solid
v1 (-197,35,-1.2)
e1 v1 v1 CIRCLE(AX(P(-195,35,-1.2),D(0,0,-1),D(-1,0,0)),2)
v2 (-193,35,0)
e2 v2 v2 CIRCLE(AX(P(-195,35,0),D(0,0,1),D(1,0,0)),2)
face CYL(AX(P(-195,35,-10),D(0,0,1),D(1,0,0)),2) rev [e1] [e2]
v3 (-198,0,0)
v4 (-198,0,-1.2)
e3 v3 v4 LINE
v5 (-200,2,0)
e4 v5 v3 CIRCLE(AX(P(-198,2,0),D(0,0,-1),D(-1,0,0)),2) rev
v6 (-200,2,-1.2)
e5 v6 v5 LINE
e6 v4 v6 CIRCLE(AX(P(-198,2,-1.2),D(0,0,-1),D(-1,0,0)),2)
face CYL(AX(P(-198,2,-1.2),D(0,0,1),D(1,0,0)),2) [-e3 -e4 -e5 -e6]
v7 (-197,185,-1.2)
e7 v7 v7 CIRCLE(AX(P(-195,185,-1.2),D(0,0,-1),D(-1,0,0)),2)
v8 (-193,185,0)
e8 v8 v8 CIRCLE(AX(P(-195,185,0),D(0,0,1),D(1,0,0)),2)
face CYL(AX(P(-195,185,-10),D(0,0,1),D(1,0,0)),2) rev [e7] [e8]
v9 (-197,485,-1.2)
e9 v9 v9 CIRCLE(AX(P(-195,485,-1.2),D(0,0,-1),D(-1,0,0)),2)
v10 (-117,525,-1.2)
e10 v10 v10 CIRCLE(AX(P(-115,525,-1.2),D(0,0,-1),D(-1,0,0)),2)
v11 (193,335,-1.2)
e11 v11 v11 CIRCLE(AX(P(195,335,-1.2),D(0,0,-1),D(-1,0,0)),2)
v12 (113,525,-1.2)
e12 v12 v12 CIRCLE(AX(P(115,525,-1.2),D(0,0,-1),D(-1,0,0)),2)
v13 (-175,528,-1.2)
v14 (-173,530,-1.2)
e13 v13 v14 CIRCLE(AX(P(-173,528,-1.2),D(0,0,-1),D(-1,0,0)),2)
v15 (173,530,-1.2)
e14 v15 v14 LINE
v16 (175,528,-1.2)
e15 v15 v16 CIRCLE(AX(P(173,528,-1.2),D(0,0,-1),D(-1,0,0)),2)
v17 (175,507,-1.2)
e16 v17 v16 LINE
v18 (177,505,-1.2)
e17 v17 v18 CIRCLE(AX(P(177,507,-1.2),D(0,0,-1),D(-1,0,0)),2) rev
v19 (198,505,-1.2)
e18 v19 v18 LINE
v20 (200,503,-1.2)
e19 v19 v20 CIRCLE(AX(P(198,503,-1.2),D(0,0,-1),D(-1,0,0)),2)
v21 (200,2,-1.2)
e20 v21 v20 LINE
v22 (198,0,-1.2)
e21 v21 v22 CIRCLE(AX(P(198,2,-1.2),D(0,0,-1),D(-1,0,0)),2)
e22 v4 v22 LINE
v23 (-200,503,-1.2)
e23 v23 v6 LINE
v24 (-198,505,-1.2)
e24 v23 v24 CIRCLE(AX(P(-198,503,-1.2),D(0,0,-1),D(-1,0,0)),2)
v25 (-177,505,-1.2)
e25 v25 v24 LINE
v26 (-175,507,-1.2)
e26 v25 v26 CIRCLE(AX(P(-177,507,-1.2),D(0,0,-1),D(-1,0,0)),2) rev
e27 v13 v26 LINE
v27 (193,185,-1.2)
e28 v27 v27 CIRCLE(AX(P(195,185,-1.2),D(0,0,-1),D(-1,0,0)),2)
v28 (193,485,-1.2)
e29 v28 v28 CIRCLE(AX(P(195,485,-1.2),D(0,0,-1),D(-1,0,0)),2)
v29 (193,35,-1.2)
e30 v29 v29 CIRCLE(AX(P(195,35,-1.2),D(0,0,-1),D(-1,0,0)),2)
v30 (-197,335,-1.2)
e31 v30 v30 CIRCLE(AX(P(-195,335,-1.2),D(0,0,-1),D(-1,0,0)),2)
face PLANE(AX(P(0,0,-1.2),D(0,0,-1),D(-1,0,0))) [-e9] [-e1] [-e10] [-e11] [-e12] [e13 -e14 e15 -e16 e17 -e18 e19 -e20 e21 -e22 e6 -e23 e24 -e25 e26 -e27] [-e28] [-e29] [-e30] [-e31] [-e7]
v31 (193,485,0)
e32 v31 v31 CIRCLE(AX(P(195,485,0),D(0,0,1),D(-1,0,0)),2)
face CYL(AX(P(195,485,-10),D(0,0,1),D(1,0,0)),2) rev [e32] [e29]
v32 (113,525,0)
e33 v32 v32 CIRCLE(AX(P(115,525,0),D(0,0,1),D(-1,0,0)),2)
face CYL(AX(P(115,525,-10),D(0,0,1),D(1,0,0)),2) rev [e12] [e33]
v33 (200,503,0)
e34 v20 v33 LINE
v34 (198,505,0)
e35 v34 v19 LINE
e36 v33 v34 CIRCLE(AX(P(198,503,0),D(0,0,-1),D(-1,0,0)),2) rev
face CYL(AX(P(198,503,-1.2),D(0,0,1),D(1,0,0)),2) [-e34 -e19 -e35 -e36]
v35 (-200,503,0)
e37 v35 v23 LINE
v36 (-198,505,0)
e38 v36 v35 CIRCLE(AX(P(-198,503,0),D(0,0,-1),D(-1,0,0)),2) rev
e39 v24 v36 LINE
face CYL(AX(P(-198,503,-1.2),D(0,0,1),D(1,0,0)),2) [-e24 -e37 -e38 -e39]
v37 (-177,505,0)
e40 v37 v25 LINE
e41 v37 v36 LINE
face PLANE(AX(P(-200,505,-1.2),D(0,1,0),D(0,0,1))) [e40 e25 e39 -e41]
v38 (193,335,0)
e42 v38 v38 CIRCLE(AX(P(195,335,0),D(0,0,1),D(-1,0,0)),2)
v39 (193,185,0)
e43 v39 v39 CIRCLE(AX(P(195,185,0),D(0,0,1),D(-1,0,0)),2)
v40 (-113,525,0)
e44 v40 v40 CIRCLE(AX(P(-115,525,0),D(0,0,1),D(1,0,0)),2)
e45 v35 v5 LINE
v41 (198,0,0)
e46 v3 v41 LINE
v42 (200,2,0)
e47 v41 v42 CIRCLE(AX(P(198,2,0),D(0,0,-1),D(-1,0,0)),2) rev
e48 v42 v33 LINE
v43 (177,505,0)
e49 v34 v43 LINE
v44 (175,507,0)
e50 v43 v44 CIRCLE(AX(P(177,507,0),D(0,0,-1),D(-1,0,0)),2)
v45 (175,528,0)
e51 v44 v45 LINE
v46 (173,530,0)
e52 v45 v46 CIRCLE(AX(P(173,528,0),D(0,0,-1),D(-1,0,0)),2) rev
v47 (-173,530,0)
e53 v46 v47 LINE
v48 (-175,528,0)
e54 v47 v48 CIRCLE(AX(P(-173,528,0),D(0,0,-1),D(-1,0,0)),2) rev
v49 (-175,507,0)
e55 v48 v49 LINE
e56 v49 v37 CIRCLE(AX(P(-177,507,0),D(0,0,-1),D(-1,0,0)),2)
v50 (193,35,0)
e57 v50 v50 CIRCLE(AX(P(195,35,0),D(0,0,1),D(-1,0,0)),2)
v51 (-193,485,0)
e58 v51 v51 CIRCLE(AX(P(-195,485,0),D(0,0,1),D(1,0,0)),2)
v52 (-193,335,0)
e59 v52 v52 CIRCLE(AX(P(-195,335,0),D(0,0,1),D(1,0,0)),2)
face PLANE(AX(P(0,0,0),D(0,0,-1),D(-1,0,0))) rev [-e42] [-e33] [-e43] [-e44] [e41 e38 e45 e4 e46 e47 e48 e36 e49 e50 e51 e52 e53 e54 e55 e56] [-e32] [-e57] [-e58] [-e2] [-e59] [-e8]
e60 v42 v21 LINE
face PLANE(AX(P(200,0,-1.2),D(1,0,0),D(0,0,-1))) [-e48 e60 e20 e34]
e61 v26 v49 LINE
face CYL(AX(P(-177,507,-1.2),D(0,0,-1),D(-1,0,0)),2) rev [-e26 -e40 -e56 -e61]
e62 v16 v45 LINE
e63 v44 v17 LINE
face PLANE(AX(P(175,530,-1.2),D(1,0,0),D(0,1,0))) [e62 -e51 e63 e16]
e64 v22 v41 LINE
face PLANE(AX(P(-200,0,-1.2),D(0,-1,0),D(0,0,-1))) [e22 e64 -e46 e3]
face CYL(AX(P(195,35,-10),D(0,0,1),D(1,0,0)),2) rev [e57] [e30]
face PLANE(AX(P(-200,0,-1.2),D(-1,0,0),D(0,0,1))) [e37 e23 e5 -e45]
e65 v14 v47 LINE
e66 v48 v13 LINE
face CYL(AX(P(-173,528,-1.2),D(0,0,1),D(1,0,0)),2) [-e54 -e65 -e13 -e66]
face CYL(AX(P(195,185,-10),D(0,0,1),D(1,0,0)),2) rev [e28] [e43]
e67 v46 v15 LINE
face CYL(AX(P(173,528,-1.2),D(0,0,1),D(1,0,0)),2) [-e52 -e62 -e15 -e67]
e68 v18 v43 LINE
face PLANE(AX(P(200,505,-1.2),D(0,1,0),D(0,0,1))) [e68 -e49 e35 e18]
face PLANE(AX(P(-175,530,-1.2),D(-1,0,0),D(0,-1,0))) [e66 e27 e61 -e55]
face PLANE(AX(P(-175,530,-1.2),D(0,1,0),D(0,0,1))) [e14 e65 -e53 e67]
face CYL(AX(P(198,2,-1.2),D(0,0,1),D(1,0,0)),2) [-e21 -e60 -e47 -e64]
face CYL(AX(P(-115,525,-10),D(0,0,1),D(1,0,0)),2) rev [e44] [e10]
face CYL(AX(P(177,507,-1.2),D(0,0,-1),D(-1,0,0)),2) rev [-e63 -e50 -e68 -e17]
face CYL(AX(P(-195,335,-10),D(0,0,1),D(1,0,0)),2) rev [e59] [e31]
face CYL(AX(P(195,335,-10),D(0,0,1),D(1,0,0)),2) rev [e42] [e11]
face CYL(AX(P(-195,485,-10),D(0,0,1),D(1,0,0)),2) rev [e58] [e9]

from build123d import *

# Parameters (mm, degrees)
TABAN_FLAN_1_DEPTH    = 1.2
K_ELERI_START         = -1.2
K_ELERI_K_R1_DEPTH    = 1.2
K_ELERI_K_R1_2_DEPTH  = 1.2
IZIM2_R               = 2
KES_EKSTR_ZYON1_DEPTH = 10


# Read off the part's stored shape, not the designer's step: Köşeleri kır1
# Sheet-metal steps are written as plain solids
with BuildPart() as part:
    # Çizim1 → Taban-Flanş1 (new body)
    with BuildSketch(Plane.XY):
        Polygon((-200, 0), (200, 0), (200, 505), (175, 505), (175, 530), (-175, 530), (-175, 505), (-200, 505), align=None)
    extrude(amount=-TABAN_FLAN_1_DEPTH)

    # Köşeleri kır1 outline → Köşeleri kır1 (cut)
    with BuildSketch(Plane.XY.offset(K_ELERI_START)):
        with BuildLine():
            ThreePointArc((200, 2), (199.414213562, 0.585786438), (198, 0))
            Line((198, 0), (200, 0))
            Line((200, 0), (200, 2))
        make_face()
        with BuildLine():
            Line((-200, 0), (-198, 0))
            ThreePointArc((-198, 0), (-199.414213562, 0.585786438), (-200, 2))
            Line((-200, 2), (-200, 0))
        make_face()
        with BuildLine():
            ThreePointArc((198, 505), (199.414213562, 504.414213562), (200, 503))
            Line((200, 503), (200, 505))
            Line((200, 505), (198, 505))
        make_face()
        with BuildLine():
            Line((-200, 505), (-200, 503))
            ThreePointArc((-200, 503), (-199.414213562, 504.414213562), (-198, 505))
            Line((-198, 505), (-200, 505))
        make_face()
        with BuildLine():
            ThreePointArc((173, 530), (174.414213562, 529.414213562), (175, 528))
            Line((175, 528), (175, 530))
            Line((175, 530), (173, 530))
        make_face()
        with BuildLine():
            Line((-175, 530), (-175, 528))
            ThreePointArc((-175, 528), (-174.414213562, 529.414213562), (-173, 530))
            Line((-173, 530), (-175, 530))
        make_face()
    extrude(amount=K_ELERI_K_R1_DEPTH, mode=Mode.SUBTRACT)

    # K_eleri k_r1 2 outline → K_eleri k_r1 2 (add)
    with BuildSketch(Plane.XY.offset(K_ELERI_START)):
        with BuildLine():
            Line((175, 505), (177, 505))
            ThreePointArc((177, 505), (175.585786438, 505.585786438), (175, 507))
            Line((175, 507), (175, 505))
        make_face()
        with BuildLine():
            ThreePointArc((-175, 507), (-175.585786438, 505.585786438), (-177, 505))
            Line((-177, 505), (-175, 505))
            Line((-175, 505), (-175, 507))
        make_face()
    extrude(amount=K_ELERI_K_R1_2_DEPTH)

    # Çizim2 → Kes-Ekstrüzyon1 (cut)
    with BuildSketch(Plane.XY):
        with Locations((-195, 485)):
            Circle(IZIM2_R)
        with Locations((-195, 335)):
            Circle(IZIM2_R)
        with Locations((-195, 185)):
            Circle(IZIM2_R)
        with Locations((-195, 35)):
            Circle(IZIM2_R)
        with Locations((-115, 525)):
            Circle(IZIM2_R)
        with Locations(Location((115, 525, 0), (0, 0, 180))):
            Circle(IZIM2_R)
        with Locations(Location((195, 35, 0), (0, 0, 180))):
            Circle(IZIM2_R)
        with Locations(Location((195, 185, 0), (0, 0, 180))):
            Circle(IZIM2_R)
        with Locations(Location((195, 335, 0), (0, 0, 180))):
            Circle(IZIM2_R)
        with Locations(Location((195, 485, 0), (0, 0, 180))):
            Circle(IZIM2_R)
    extrude(amount=-KES_EKSTR_ZYON1_DEPTH, mode=Mode.SUBTRACT)


solid = part.part
